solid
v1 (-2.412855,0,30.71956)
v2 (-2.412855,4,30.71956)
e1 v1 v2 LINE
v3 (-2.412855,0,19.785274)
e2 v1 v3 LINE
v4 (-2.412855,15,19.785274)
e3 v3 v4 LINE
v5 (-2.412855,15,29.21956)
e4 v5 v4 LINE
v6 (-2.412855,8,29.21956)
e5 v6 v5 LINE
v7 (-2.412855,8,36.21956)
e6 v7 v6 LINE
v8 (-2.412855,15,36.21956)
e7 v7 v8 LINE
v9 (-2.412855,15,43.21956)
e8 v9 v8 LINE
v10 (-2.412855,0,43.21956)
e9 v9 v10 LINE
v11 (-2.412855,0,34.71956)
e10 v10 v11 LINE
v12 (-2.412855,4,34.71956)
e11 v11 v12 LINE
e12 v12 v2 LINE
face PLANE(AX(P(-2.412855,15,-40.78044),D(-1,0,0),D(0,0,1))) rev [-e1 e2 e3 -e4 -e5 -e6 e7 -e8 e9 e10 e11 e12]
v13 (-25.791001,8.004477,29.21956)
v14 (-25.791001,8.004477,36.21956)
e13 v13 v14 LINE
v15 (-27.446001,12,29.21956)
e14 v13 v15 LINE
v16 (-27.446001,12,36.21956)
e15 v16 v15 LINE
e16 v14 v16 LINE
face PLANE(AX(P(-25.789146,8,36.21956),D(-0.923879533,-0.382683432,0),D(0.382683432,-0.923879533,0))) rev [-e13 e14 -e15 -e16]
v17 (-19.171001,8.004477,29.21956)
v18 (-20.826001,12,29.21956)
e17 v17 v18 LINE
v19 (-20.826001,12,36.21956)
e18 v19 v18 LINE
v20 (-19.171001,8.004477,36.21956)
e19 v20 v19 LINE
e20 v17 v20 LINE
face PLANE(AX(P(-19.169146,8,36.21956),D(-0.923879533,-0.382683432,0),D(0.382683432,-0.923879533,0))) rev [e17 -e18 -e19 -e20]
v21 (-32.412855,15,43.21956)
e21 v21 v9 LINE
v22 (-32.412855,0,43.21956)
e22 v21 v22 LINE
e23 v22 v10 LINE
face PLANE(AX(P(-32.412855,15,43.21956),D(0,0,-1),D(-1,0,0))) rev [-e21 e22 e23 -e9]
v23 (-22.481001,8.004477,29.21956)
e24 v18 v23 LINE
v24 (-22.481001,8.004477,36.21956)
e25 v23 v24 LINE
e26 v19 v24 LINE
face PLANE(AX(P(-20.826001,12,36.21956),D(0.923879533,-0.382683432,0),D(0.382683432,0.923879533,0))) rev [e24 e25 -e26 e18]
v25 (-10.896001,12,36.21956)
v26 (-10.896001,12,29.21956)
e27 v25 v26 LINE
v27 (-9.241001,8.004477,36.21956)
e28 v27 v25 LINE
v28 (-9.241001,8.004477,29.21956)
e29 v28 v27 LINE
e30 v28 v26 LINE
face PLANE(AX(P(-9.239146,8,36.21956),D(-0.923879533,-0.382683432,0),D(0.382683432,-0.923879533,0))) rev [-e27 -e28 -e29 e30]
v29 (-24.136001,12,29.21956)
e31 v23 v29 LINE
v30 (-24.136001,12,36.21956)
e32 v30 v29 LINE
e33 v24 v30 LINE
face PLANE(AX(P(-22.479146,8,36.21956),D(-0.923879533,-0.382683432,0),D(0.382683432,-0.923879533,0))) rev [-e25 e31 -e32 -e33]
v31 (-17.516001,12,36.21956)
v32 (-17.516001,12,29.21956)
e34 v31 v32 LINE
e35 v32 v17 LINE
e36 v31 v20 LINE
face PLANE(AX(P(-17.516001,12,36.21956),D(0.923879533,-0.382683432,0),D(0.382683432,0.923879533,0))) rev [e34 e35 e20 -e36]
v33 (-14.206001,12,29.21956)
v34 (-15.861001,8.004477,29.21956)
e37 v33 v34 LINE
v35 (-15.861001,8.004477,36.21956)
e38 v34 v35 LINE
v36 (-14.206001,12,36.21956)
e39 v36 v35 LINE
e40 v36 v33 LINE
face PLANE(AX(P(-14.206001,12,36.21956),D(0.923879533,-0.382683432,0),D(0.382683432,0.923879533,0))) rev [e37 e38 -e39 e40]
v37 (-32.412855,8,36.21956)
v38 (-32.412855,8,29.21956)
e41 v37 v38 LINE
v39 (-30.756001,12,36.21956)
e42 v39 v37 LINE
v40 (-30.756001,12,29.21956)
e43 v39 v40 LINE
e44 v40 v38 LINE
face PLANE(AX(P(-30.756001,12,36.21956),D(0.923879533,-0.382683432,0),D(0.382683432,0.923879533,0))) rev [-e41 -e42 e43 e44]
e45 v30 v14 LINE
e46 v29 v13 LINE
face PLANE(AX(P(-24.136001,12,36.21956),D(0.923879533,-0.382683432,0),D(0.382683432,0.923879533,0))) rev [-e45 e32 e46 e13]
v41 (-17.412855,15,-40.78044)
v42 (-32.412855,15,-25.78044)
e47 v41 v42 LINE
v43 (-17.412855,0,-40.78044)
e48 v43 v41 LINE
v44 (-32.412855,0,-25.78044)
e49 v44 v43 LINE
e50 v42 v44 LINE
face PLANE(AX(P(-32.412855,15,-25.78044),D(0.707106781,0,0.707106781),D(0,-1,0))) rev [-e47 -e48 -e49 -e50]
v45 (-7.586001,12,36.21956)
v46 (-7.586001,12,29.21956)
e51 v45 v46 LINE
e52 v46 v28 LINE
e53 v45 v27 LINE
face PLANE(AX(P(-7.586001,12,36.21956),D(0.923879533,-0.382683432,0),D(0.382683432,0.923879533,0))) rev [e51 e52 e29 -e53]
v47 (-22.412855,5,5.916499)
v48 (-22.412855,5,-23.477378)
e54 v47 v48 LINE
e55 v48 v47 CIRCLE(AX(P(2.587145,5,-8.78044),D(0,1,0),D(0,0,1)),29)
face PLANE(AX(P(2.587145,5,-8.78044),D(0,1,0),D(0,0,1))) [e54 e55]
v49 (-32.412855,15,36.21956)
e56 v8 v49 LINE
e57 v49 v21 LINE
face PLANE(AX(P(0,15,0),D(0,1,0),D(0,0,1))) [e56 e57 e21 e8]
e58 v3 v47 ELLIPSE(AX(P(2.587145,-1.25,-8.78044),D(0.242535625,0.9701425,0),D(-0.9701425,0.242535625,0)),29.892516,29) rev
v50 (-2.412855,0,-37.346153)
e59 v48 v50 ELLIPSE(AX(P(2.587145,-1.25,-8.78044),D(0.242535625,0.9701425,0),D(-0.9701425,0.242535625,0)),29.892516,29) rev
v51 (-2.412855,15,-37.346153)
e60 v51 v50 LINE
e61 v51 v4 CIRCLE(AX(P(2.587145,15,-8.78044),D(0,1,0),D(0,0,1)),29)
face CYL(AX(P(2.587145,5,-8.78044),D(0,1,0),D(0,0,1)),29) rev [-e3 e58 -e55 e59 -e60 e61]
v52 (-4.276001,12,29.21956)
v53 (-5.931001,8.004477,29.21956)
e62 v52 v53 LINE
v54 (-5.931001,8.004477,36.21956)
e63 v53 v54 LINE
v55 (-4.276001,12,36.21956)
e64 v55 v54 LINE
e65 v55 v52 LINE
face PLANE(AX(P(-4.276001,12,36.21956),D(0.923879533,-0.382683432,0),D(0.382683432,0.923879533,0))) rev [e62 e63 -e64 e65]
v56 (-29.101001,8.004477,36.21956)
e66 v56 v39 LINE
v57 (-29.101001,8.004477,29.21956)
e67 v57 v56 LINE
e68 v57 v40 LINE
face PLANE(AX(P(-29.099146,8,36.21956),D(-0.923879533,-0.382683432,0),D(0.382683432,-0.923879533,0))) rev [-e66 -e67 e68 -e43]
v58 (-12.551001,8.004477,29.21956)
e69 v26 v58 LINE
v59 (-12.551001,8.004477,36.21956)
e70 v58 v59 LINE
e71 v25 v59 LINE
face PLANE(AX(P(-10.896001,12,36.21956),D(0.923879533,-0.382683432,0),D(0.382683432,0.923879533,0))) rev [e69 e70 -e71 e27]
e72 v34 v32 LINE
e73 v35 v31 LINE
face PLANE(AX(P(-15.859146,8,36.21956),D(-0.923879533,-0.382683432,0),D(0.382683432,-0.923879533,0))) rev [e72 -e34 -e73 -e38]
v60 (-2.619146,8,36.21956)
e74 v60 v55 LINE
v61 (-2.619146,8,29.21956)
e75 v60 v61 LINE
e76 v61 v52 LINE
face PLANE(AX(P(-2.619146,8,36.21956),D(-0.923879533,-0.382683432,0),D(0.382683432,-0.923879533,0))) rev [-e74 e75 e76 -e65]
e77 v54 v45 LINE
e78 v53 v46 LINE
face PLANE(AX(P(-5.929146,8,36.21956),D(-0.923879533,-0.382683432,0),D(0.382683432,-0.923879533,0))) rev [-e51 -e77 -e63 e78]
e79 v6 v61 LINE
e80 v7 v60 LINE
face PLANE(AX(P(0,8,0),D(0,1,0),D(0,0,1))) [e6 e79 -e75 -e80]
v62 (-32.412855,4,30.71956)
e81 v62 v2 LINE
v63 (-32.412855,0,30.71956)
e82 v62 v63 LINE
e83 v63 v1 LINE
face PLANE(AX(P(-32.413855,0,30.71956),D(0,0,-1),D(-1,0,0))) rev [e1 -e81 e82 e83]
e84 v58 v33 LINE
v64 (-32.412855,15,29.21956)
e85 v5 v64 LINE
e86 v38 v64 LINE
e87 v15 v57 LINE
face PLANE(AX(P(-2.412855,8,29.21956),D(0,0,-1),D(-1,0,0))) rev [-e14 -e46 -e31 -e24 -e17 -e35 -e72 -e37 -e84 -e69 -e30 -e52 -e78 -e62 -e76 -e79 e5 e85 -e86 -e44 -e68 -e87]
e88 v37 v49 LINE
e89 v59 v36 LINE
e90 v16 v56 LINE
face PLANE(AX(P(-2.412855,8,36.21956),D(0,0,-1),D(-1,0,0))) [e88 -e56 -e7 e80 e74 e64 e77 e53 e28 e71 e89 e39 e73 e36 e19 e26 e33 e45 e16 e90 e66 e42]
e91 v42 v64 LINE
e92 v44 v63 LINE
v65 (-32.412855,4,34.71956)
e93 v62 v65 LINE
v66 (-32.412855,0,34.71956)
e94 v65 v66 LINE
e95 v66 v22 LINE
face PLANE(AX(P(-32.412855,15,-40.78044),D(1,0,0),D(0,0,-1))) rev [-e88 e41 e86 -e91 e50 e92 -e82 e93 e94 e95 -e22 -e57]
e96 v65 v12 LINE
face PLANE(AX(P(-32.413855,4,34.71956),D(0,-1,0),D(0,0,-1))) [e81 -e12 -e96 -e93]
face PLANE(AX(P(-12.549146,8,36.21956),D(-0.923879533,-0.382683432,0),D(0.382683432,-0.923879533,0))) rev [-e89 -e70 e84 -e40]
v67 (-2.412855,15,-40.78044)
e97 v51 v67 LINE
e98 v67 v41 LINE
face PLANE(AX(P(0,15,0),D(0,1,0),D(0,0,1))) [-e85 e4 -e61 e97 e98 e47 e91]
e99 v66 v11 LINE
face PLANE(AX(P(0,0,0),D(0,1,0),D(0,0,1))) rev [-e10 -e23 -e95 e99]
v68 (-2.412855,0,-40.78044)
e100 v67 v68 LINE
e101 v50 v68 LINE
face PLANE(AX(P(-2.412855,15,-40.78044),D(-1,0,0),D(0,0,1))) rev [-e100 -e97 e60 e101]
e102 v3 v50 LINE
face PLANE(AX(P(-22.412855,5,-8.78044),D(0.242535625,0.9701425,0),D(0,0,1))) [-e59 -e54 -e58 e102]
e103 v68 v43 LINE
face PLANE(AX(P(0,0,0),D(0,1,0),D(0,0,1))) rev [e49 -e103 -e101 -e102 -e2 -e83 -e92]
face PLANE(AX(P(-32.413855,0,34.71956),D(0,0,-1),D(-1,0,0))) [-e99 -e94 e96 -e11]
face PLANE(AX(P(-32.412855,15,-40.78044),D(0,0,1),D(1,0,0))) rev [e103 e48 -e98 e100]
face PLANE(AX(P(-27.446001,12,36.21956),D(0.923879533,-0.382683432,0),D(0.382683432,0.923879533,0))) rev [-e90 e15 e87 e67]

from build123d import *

# Parameters (mm, degrees)
ESQUISSE2_W                = 30
ESQUISSE2_H                = 84
BOSS_EXTRU_1_DEPTH         = 15
ESQUISSE3_R                = 29
ENL_V_MAT_EXTRU_1_DEPTH    = 10
CHANFREIN1_SIZE            = 5
CHANFREIN1_SIZE_2          = 20
CHANFREIN2_SIZE            = 15
ESQUISSE7_W                = 30
ESQUISSE7_H                = 7
ENL_V_MAT_EXTRU_2_DEPTH    = 7
BOSS_EXTRU_2_DEPTH         = 7
R_P_TITION_LIN_AIRE1_COUNT = 9
R_P_TITION_LIN_AIRE1_PITCH = 3.31
ENL_V_MAT_EXTRU_3_REACH    = 56.708
ESQUISSE9_W                = 4
ESQUISSE9_H                = 4


with BuildPart() as part:
    # Esquisse2 → Boss.-Extru.1 (new body)
    with BuildSketch(Plane(origin=(0, 0, 0), x_dir=(1, 0, 0), z_dir=(0, 1, 0))):
        with Locations((-17.412854797, -1.219560319)):
            Rectangle(ESQUISSE2_W, ESQUISSE2_H)
    extrude(amount=BOSS_EXTRU_1_DEPTH)

    # Esquisse3 → Enlèv. mat.-Extru.1 (cut)
    with BuildSketch(Plane(origin=(0, 15, 0), x_dir=(1, 0, 0), z_dir=(0, 1, 0))):
        with Locations((2.587145203, 8.780439681)):
            Circle(ESQUISSE3_R)
    extrude(amount=-ENL_V_MAT_EXTRU_1_DEPTH, mode=Mode.SUBTRACT)

    # Chanfrein1
    # the kernel refuses this chamfer: 20, 5 mm, written as the material it takes off along each edge
    with BuildSketch(Plane(origin=(-2.412854797, 5, -89.288703391), x_dir=(0.14778356633657125, -0.9890197255468893, 0), z_dir=(0, 0, 1))) as chanfrein1_piece_1_section:
        Polygon((CHANFREIN1_SIZE * 0.989019725547, -CHANFREIN1_SIZE * 0.147783566337), (-CHANFREIN1_SIZE_2 * 0.147783566337, -CHANFREIN1_SIZE_2 * 0.989019725547), (0, 0), align=None)
    chanfrein1_piece_1 = extrude(amount=161.016527419, mode=Mode.PRIVATE)
    chanfrein1_piece_1 = chanfrein1_piece_1 & Plane(origin=(2.587145203, 3.276810051, -8.780439681), x_dir=(1, 0, 0), z_dir=(0, 1, 0)) * Cylinder(29, 402, mode=Mode.PRIVATE)
    add(chanfrein1_piece_1, mode=Mode.SUBTRACT)

    # Chanfrein2
    chanfrein2_edges = [part.edges().sort_by_distance(p)[0] for p in [
        (-32.412854797, 7.5, -40.780439681),
    ]]
    chamfer(chanfrein2_edges, length=CHANFREIN2_SIZE)

    # Esquisse7 → Enlèv. mat.-Extru.2 (cut)
    with BuildSketch(Plane(origin=(0, 15, 0), x_dir=(1, 0, 0), z_dir=(0, 1, 0))):
        with Locations((-17.412854797, -32.719560319)):
            Rectangle(ESQUISSE7_W, ESQUISSE7_H)
    extrude(amount=-ENL_V_MAT_EXTRU_2_DEPTH, mode=Mode.SUBTRACT)

    # Esquisse8 → Boss.-Extru.2 (add)
    with BuildSketch(Plane.XY.offset(29.219560319)):
        Polygon((-32.412854797, 8), (-29.099146298, 8), (-30.756000548, 12), align=None)
    boss_extru_2 = extrude(amount=BOSS_EXTRU_2_DEPTH)

    # Répétition linéaire1: Boss.-Extru.2 ×9
    with Locations(*[(i * R_P_TITION_LIN_AIRE1_PITCH, 0, 0) for i in range(1, R_P_TITION_LIN_AIRE1_COUNT)]):
        add(boss_extru_2)

    # Esquisse9 → Enlèv. mat.-Extru.3 (cut, up to next)
    with BuildSketch(Plane(origin=(-2.412854797, 0, 0), x_dir=(0, 0, -1), z_dir=(1, 0, 0)), mode=Mode.PRIVATE) as enl_v_mat_extru_3_sk1:
        with Locations((-32.719560319, 2)):
            Rectangle(ESQUISSE9_W, ESQUISSE9_H)
    enl_v_mat_extru_3_tool1 = extrude(enl_v_mat_extru_3_sk1.sketch, amount=-ENL_V_MAT_EXTRU_3_REACH, mode=Mode.PRIVATE) & part.part
    add(enl_v_mat_extru_3_tool1.solids().sort_by_distance((-2.412855, 2, 32.71956))[0], mode=Mode.SUBTRACT)


solid = part.part
